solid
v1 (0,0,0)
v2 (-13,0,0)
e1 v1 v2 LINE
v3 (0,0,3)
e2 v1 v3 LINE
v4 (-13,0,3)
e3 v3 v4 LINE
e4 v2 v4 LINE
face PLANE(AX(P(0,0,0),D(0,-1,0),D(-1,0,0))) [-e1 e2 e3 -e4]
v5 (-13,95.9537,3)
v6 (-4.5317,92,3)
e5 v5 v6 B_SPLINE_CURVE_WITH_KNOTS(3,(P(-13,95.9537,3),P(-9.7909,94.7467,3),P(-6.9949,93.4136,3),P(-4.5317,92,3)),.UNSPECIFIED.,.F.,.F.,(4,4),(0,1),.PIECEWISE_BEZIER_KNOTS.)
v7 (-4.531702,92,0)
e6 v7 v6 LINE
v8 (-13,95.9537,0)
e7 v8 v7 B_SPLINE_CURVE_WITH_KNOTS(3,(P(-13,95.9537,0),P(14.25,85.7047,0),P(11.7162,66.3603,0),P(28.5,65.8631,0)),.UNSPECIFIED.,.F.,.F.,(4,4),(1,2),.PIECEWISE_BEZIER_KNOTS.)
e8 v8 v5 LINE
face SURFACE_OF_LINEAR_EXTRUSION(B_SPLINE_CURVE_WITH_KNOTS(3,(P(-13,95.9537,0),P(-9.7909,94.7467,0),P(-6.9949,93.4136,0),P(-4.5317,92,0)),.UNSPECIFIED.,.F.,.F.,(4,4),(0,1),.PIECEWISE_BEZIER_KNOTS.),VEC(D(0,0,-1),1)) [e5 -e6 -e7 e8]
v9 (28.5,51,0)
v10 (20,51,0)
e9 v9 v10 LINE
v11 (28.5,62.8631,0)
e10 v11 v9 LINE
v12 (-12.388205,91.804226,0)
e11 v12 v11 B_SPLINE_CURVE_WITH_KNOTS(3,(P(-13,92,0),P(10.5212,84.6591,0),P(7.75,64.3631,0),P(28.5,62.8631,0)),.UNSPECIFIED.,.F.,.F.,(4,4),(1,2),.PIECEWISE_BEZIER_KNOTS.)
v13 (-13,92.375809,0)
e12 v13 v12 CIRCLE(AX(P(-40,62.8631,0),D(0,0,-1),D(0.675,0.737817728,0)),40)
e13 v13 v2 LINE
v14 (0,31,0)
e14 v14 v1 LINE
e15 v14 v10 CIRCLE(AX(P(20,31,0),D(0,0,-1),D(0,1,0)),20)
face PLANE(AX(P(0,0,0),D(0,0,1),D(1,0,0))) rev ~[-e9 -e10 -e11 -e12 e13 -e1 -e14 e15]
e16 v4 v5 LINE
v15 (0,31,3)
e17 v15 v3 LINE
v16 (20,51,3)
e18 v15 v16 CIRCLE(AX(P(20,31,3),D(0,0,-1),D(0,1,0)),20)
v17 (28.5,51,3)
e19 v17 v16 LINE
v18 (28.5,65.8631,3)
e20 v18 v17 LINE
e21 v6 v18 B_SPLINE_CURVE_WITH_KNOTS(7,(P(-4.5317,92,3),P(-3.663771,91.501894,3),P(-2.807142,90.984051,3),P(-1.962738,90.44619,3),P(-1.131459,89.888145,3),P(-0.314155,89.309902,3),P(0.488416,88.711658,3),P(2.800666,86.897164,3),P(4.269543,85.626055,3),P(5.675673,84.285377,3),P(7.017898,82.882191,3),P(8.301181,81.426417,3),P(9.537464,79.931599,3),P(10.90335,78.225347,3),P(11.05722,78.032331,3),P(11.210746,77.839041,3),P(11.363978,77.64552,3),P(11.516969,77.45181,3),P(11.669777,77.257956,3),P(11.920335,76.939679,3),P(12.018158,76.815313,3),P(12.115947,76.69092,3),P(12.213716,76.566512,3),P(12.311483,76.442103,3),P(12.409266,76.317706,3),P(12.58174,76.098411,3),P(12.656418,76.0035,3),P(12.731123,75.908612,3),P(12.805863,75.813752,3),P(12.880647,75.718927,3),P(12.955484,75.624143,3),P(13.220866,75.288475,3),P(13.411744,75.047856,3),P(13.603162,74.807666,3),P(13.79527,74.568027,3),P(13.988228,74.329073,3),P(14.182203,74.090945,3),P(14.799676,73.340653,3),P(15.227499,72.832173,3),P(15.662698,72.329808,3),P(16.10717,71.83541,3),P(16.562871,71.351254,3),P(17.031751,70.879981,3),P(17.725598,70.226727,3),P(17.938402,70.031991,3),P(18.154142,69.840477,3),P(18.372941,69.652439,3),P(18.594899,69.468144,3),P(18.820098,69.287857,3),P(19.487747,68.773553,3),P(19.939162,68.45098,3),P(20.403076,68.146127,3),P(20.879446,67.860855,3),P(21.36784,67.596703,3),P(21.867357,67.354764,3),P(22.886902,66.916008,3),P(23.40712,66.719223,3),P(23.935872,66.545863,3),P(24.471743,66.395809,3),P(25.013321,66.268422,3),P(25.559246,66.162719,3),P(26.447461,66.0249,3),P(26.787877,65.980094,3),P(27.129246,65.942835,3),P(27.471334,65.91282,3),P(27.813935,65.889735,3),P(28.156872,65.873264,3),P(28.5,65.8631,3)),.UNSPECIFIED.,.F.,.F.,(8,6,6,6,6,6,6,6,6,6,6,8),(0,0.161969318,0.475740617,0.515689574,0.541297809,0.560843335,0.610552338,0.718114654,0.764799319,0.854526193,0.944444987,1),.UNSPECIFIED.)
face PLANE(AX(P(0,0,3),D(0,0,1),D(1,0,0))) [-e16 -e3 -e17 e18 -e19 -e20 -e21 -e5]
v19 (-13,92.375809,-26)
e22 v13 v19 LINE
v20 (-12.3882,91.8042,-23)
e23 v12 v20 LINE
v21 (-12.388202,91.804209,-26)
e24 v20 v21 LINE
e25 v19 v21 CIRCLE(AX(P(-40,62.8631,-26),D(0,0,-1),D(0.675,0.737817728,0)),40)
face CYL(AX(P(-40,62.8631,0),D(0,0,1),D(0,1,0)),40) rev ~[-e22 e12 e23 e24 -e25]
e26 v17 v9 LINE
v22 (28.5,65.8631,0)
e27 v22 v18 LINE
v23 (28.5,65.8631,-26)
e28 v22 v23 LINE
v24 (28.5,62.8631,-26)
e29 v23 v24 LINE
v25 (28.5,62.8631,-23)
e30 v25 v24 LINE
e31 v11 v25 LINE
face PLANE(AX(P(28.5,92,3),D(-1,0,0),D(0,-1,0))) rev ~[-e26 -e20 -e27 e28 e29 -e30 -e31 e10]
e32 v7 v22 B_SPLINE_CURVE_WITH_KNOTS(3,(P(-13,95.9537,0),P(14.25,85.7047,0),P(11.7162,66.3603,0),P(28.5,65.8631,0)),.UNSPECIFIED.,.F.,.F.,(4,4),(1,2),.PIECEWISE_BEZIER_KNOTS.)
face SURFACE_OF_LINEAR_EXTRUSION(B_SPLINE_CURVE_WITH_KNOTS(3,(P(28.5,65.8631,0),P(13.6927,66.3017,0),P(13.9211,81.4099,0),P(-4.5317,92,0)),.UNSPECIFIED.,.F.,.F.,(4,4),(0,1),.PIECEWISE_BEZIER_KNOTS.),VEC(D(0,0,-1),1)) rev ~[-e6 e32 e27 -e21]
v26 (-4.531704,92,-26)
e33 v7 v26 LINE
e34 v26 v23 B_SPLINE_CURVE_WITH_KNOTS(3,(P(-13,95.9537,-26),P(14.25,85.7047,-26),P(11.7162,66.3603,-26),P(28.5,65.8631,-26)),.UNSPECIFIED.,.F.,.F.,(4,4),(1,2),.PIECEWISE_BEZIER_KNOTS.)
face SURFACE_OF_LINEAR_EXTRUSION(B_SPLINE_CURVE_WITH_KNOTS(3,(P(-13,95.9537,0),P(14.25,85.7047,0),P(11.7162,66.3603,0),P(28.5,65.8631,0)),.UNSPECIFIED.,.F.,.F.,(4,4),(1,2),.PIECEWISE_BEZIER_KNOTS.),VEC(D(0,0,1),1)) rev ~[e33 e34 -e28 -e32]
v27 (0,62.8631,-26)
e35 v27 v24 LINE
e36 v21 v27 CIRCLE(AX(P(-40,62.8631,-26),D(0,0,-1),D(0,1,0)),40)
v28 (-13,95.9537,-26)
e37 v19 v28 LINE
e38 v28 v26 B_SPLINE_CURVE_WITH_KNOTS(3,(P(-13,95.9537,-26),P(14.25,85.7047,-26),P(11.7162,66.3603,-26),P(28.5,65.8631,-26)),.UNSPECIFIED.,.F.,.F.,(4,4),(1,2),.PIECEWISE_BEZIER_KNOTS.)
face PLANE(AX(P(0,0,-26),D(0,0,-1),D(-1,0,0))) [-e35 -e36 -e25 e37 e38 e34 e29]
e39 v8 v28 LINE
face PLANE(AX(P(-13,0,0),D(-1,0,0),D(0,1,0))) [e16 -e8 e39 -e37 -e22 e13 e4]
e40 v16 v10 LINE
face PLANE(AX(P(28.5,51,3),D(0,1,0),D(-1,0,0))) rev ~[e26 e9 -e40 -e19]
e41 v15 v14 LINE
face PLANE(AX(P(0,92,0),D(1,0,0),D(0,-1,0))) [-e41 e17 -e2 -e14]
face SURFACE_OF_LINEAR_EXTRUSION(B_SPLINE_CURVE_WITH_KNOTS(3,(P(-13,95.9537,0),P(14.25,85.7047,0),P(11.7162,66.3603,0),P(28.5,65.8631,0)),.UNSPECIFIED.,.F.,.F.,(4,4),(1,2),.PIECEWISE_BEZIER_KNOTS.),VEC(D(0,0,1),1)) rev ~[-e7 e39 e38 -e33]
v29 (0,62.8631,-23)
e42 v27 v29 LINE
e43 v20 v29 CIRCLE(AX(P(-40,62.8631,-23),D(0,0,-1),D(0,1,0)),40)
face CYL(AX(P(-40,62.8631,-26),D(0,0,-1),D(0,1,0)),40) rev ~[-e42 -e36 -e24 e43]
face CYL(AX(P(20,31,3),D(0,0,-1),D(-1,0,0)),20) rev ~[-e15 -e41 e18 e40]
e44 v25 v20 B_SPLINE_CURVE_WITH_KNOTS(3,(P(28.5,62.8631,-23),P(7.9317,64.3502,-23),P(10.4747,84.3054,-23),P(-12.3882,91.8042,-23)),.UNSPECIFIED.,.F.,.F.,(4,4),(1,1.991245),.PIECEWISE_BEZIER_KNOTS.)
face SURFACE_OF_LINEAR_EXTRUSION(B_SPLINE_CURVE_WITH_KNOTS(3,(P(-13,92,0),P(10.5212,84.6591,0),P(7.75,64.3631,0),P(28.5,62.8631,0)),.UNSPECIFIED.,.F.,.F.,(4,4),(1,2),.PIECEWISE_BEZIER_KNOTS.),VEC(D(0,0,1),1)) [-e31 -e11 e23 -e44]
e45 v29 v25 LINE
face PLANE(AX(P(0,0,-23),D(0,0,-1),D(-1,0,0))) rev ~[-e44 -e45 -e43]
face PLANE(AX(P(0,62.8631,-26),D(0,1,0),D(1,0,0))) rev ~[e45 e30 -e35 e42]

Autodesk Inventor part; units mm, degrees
ref_plane "YZ Plane" through (0, 0, 0) normal (1, 0, 0) x (0, 1, 0)
ref_plane "XZ Plane" through (0, 0, 0) normal (0, 1, 0) x (-1, 0, 0)
ref_plane "XY Plane" through (0, 0, 0) normal (0, 0, 1) x (1, 0, 0)
sketch "Sketch1" plane through (0, 0, 0) normal (0, 0, 1) x (1, 0, 0)
  line L0 (0, 0) -> (-13, 0)
  line L1 (-13, 0) -> (-13, 92)
  line L2 (-13, 92) -> (0, 92)
  line L3 (0, 92) -> (0, 0)
  dimension "d0" = 13
  dimension "d1" = 92
extrude "Extrusion1" add sketch "Sketch1" along normal blind 3
sketch "Sketch3" plane through (0, 0, 3) normal (0, 0, 1) x (1, 0, 0)
  line L0 (0, 92) -> (-13, 92) projected
  line L1 (0, 92) -> (28.5, 92)
  line L2 (28.5, 92) -> (28.5, 51)
  line L3 (28.5, 51) -> (0, 51)
  line L4 (0, 51) -> (0, 92)
  point P0 (0, 0)
  dimension "d6" = 28.5
  dimension "d7" = 41
extrude "Extrusion3" add sketch "Sketch3" against normal up to surface (3 mm away)
sketch "Sketch4" plane through (0, 0, 0) normal (0, 0, -1) x (-1, 0, 0)
  arc A0 (40, 102.8631) -> (0, 62.8631) centre (40, 62.8631) ccw
  arc A1 (-28.5, 65.8631) -> (-42.9914, -4.1369) centre (-28.5, 29.3631) ccw
  line L0 (13, 92) -> (0, 92)
  line L1 (0, 92) -> (-28.5, 92)
  line L2 (-28.5, 92) -> (-28.5, 51)
  line L3 (-28.5, 92) -> (13, 92) projected
  line L4 (-28.5, 65.8631) -> (-28.5, 62.8631)
  line L5 (-28.5, 51) -> (-28.5, 92) projected
  line L6 (13, 92) -> (13, 89)
  line L7 (13, 92) -> (13, 0) projected
  arc A2 (40, 105.4873) -> (13, 95.9537) centre (40, 62.4873) ccw
  line L8 (13, 92) -> (13, 95.9537)
  line L9 (13, 92) -> (-10.5212, 84.6591) construction
  line L10 (-10.5212, 84.6591) -> (-7.75, 64.3631) construction
  line L11 (-7.75, 64.3631) -> (-28.5, 62.8631) construction
  spline S0 degree 3 poles (13, 92) (-10.5212, 84.6591) (-7.75, 64.3631) (-28.5, 62.8631) knots 1 1 1 1 2 2 2 2
  line L12 (13, 95.9537) -> (-14.25, 85.7047) construction
  line L13 (-14.25, 85.7047) -> (-11.7162, 66.3603) construction
  line L14 (-11.7162, 66.3603) -> (-28.5, 65.8631) construction
  spline S1 degree 3 poles (13, 95.9537) (-14.25, 85.7047) (-11.7162, 66.3603) (-28.5, 65.8631) knots 1 1 1 1 2 2 2 2
  point P0 (0, 0)
  point P1 (12.3882, 91.8042)
  point P2 (13, 92.3758)
  dimension "d10" = 3
  dimension "d11" = 3
extrude "Extrusion4" add sketch "Sketch4" along normal blind 26 contours A0 L0 S1 L8 | A0 S0 L2 S1 L0
sketch "Sketch5" plane through (0, 0, 0) normal (0, 0, -1) x (-1, 0, 0)
  spline S0 degree 3 poles (-28.5, 65.8631) (-13.6927, 66.3017) (-13.9211, 81.4099) (4.5317, 92) knots 0 0 0 0 1 1 1 1 projected
  line L0 (-28.5, 92) -> (4.5317, 92) projected
  line L1 (-28.5, 92) -> (-28.5, 65.8631) projected
  point P0 (0, 0)
extrude "Extrusion5" cut sketch "Sketch5" against normal blind 40
sketch "Sketch6" plane through (0, 0, 0) normal (0, 0, 1) x (1, 0, 0)
  line L0 (-4.5317, 92) -> (-12.5949, 92) projected
  spline S0 degree 3 poles (-13, 95.9537) (-9.7909, 94.7467) (-6.9949, 93.4136) (-4.5317, 92) knots 0 0 0 0 1 1 1 1 projected
  line L1 (-13, 92.3758) -> (-13, 95.9537) projected
  arc A0 (-12.5949, 92) -> (-13, 92.3758) centre (-40, 62.8631) ccw projected
  arc A1 (-12.5949, 92) -> (-13, 92.3758) centre (-40, 62.8631) ccw projected
  line L2 (-13, 92.3758) -> (-13, 92)
  line L3 (-13, 92) -> (-12.5949, 92)
  point P0 (0, 0)
extrude "Extrusion6" add sketch "Sketch6" along normal up to surface (3 mm away)
sketch "Sketch7" plane through (0, 0, -26) normal (0, 0, -1) x (-1, 0, 0)
  spline S0 degree 3 poles (-28.5, 62.8631) (-7.9317, 64.3502) (-10.4747, 84.3054) (12.3882, 91.8042) knots 1 1 1 1 1.991245 1.991245 1.991245 1.991245
  arc A0 (40, 102.8631) -> (0, 62.8631) centre (40, 62.8631) ccw
  line L0 (0, 62.8631) -> (-28.5, 62.8631)
  line L1 (-28.5, 62.8631) -> (-28.5, 65.8631)
  line L2 (-28.5, 51) -> (-28.5, 65.8631) projected
  point P0 (0, 0)
extrude "Extrusion7" add sketch "Sketch7" against normal blind 3
fillet "Fillet1" radius 20 1 edges at (0, 51, 1.5)
properties part number "obudowa przekładni 6 LEFT"
